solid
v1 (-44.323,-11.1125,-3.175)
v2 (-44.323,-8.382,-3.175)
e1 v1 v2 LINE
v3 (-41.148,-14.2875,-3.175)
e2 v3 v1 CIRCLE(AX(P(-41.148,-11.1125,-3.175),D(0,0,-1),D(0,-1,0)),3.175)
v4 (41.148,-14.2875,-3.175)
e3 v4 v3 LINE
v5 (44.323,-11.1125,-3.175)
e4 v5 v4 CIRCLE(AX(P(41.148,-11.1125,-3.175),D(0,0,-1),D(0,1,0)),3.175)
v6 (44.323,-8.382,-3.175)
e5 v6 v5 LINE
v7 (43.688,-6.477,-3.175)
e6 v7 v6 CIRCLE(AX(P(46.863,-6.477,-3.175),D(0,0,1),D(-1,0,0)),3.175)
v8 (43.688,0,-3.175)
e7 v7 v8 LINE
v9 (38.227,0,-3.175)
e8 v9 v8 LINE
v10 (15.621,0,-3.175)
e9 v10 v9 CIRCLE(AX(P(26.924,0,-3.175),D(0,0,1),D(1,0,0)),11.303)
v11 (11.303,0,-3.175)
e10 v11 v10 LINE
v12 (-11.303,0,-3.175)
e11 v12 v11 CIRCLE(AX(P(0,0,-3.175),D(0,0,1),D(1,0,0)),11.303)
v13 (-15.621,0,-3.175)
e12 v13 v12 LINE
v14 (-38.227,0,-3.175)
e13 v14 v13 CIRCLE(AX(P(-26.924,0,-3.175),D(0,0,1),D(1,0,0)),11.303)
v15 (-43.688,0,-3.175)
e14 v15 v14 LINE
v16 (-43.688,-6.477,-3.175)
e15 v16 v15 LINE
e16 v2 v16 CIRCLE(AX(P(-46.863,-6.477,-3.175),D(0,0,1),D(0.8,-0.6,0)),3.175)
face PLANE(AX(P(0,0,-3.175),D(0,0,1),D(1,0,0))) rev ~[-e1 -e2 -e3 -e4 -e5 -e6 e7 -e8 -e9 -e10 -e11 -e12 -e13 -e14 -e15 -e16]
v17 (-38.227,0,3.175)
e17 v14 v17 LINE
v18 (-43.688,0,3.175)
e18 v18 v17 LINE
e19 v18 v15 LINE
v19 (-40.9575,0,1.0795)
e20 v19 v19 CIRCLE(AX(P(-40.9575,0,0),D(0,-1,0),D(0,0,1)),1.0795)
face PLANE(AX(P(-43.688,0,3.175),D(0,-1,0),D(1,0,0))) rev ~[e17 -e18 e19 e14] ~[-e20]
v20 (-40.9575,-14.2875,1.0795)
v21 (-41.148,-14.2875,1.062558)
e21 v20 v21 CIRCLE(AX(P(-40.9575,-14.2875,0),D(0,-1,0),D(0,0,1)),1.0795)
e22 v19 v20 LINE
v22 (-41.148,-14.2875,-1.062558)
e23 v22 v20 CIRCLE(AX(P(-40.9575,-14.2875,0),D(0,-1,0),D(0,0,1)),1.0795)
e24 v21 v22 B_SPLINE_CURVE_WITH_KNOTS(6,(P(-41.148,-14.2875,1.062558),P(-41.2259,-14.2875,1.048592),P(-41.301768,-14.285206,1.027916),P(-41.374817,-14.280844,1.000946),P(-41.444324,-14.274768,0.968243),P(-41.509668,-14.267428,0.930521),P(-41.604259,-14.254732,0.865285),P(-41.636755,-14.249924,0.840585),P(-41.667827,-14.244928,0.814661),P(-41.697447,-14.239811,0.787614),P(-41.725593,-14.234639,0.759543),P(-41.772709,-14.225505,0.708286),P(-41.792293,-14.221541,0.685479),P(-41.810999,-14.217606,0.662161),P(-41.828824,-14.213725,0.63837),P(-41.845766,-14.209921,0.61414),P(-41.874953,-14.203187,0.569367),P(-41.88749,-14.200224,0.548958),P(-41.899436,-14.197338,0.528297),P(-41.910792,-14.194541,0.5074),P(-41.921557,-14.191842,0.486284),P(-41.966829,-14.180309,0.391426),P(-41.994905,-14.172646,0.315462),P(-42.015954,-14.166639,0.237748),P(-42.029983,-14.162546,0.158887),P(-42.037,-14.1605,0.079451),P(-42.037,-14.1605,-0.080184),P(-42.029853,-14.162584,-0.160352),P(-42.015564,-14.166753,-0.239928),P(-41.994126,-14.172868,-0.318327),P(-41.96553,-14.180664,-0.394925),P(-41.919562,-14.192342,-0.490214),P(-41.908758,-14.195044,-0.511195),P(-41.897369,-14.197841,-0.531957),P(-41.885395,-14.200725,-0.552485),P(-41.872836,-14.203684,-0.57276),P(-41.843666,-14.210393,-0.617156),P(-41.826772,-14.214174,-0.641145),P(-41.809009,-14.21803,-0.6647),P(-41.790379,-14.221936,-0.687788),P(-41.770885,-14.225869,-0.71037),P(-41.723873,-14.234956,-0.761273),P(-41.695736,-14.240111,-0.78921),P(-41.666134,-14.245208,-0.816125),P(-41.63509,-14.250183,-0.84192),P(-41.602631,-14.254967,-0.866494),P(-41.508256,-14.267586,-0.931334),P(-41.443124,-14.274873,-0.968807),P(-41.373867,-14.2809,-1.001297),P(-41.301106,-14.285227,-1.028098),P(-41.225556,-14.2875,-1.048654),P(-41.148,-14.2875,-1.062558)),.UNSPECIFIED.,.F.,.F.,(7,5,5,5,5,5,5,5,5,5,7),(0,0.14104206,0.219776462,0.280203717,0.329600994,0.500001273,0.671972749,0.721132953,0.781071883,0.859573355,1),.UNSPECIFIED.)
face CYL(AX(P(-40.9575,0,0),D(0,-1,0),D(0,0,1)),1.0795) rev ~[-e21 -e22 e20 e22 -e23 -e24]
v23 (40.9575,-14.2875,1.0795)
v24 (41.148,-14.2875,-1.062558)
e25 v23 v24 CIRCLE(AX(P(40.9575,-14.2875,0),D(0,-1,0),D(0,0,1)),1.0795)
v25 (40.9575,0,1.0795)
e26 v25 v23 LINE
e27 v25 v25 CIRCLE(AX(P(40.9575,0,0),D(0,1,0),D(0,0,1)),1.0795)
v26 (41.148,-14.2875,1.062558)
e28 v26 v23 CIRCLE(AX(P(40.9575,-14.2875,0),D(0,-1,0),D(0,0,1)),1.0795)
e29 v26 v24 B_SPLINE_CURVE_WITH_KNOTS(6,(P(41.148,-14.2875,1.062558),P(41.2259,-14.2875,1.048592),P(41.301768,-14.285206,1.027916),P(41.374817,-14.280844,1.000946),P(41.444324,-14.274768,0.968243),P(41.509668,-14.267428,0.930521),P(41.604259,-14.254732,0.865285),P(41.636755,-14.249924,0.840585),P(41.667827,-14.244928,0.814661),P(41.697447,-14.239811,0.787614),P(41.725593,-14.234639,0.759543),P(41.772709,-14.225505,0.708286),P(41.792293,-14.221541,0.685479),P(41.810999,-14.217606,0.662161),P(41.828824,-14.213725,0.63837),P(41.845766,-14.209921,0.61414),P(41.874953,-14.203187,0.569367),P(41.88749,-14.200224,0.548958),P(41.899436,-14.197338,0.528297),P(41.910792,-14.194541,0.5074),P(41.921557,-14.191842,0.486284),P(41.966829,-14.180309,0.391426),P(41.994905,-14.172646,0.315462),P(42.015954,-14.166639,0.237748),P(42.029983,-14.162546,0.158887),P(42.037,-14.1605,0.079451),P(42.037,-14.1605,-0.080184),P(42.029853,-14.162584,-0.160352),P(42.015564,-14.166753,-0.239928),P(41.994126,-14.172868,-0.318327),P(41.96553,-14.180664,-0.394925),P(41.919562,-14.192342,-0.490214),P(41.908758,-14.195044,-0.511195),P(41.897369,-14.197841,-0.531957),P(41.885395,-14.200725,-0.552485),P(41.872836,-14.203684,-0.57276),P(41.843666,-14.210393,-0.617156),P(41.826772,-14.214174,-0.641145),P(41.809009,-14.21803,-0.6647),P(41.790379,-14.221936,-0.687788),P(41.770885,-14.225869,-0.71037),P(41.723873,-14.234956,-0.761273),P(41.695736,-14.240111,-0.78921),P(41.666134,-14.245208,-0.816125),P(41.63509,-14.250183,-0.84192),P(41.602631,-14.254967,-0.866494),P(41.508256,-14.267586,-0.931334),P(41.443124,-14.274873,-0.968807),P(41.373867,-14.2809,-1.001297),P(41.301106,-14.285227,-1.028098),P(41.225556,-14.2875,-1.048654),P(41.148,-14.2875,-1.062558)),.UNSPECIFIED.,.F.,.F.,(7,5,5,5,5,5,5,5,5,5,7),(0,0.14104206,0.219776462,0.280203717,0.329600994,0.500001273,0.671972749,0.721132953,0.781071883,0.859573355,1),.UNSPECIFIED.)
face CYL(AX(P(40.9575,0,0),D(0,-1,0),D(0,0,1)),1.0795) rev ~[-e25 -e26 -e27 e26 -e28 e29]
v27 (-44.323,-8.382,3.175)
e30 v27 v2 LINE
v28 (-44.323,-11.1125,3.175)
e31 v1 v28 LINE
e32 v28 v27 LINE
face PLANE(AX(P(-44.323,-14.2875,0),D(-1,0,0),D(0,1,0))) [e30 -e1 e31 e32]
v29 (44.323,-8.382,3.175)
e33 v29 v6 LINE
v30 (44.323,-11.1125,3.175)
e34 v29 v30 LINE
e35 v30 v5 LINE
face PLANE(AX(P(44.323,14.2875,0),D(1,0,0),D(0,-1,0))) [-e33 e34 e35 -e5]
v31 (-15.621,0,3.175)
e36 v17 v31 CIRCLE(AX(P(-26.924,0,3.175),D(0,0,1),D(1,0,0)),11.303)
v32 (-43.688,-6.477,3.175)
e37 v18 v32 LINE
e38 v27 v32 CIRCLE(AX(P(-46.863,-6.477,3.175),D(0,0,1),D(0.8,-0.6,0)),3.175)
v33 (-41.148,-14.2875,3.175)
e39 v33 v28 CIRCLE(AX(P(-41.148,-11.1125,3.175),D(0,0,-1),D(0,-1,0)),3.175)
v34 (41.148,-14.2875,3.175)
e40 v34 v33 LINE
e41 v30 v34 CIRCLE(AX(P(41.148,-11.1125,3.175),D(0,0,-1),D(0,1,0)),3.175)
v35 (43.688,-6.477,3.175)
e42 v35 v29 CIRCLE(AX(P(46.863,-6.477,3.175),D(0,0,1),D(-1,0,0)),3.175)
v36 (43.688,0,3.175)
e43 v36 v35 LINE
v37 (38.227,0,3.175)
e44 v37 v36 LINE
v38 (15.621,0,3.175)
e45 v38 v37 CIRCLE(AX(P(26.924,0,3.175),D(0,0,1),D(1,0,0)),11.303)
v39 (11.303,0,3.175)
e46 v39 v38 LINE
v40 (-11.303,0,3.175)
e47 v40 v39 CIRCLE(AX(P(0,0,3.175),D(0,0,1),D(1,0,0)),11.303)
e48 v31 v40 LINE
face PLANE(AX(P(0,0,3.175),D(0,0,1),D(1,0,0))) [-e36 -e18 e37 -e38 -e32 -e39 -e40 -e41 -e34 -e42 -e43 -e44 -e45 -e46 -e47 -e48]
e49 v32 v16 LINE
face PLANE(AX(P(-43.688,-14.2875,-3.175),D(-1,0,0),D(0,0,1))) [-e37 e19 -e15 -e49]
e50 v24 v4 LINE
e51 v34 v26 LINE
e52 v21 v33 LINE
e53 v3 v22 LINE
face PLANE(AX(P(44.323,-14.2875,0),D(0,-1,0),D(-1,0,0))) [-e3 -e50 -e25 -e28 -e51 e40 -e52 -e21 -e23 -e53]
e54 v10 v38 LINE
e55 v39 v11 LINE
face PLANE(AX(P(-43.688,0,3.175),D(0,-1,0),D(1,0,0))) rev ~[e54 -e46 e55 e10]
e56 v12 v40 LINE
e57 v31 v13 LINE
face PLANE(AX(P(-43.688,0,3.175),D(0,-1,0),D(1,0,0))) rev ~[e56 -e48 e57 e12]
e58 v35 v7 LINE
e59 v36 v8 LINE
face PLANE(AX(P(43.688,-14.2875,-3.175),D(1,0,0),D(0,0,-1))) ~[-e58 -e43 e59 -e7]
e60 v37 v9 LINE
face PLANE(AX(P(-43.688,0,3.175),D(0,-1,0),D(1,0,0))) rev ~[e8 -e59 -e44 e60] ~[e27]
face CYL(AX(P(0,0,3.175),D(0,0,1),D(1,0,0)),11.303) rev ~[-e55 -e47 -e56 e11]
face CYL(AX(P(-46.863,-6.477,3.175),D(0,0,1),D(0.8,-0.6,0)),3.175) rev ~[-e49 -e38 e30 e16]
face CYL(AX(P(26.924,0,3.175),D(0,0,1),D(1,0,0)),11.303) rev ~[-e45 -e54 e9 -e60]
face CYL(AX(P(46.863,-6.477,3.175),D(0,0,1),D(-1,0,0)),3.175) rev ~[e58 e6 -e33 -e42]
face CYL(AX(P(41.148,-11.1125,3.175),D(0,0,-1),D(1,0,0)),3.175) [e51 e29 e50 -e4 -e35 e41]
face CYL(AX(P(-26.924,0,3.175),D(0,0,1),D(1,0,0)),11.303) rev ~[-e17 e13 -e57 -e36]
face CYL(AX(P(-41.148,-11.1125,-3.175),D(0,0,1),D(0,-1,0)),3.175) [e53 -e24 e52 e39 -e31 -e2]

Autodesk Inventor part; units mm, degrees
ref_plane "YZ Plane" through (0, 0, 0) normal (1, 0, 0) x (0, 1, 0)
ref_plane "XZ Plane" through (0, 0, 0) normal (0, 1, 0) x (-1, 0, 0)
ref_plane "XY Plane" through (0, 0, 0) normal (0, 0, 1) x (1, 0, 0)
sketch "Sketch1" plane through (0, 0, 0) normal (0, 0, 1) x (1, 0, 0)
  line L0 (-44.323, 14.2875) -> (44.323, 14.2875)
  line L1 (44.323, 14.2875) -> (44.323, -14.2875)
  line L2 (44.323, -14.2875) -> (-44.323, -14.2875)
  line L3 (-44.323, -14.2875) -> (-44.323, 14.2875)
  point P0 (0, 0)
  dimension "d0" = 88.646
  dimension "d1" = 44.323
  dimension "d2" = 14.2875
  dimension "d3" = 28.575
extrude "Extrusion1" add sketch "Sketch1" along normal mid plane 6.35
sketch "Sketch2" plane through (0, 0, 3.175) normal (0, 0, 1) x (1, 0, 0)
  circle A0 centre (-26.924, 0) radius 11.303
  circle A1 centre (0, 0) radius 11.303
  line L0 (44.323, -14.2875) -> (44.323, 14.2875) projected
  circle A2 centre (26.924, 0) radius 11.303
  line L1 (-44.323, 14.2875) -> (-44.323, -14.2875) projected
  line L2 (-44.323, 0) -> (44.323, 0) construction
  line L3 (44.323, 14.2875) -> (-44.323, 14.2875) projected
  point P0 (0, 0)
  dimension "d6" = 22.606
  dimension "d9" = 22.606
  dimension "d11" = 22.606
  dimension "d14" = 26.924
  dimension "d21" = 88.646
  dimension "d22" = 26.924
  dimension "d50" = 0
sketch "Sketch4" plane through (-44.323, -14.2875, -3.175) normal (-1, 0, 0) x (0, 0, 1)
  line L0 (0, 0) -> (0, 28.575) projected
  line L1 (6.35, 28.575) -> (6.35, 0) projected
  line L2 (0, 22.6695) -> (6.35, 22.6695)
  line L3 (6.35, 22.6695) -> (6.35, 5.9055)
  line L4 (6.35, 5.9055) -> (0, 5.9055)
  line L5 (0, 5.9055) -> (0, 22.6695)
  point P0 (3.175, 14.2875)
  dimension "d30" = 8.382
  dimension "d31" = 16.764
extrude "Extrusion3" cut sketch "Sketch4" against normal blind 0.635
mirror "Mirror1" about plane through (0, 0, 0) normal (1, 0, 0) of "Extrusion3"
sketch "Sketch7" plane through (-44.323, -14.2875, 3.175) normal (0, -1, 0) x (1, 0, 0)
  line L0 (30.353, -14.605) -> (58.293, -14.605)
  line L1 (58.293, -14.605) -> (58.293, 8.255)
  line L2 (58.293, 8.255) -> (30.353, 8.255)
  line L3 (30.353, 8.255) -> (30.353, -14.605)
  point P0 (44.323, -3.175)
  dimension "d39" = 27.94
  dimension "d40" = 22.86
  dimension "d41" = 11.43
  dimension "d42" = 13.97
extrude "Extrusion5" [suppressed]
sketch "Sketch8" plane through (0, 0, -3.175) normal (0, 0, -1) x (-1, 0, 0)
  line L0 (-44.323, 14.2875) -> (44.323, 14.2875) projected
  line L1 (15.6718, 14.2875) -> (-15.6718, 14.2875)
  line L2 (-15.6718, 14.2875) -> (-15.6718, 52.3875)
  line L3 (-15.6718, 52.3875) -> (15.6718, 52.3875)
  line L4 (15.6718, 52.3875) -> (15.6718, 14.2875)
  point P0 (0, 0)
  dimension "d45" = 31.3436
  dimension "d46" = 38.1
  dimension "d47" = 15.6718
extrude "Extrusion6" add sketch "Sketch8" against normal up to surface (6.35 mm away)
extrude "Extrusion7" cut sketch "Sketch2" against normal blind 25.4
sketch "Sketch9" plane through (-15.6718, 52.3875, -3.175) normal (0, 1, 0) x (1, 0, 0)
  line L0 (-28.6512, -6.35) -> (59.9948, -6.35) projected
  line L1 (3.1718, -6.35) -> (28.1718, -6.35)
  line L2 (28.1718, -6.35) -> (28.1718, -3.175)
  line L3 (28.1718, -3.175) -> (3.1718, -3.175)
  line L4 (3.1718, -3.175) -> (3.1718, -6.35)
  point P0 (15.6718, -3.175)
  dimension "d64" = 3.175
  dimension "d65" = 25
  dimension "d66" = 12.5
extrude "Extrusion8" cut sketch "Sketch9" against normal blind 0.9
sketch "Sketch13" plane through (0, 0, 3.175) normal (0, 0, 1) x (1, 0, 0)
  line L0 (-15.6718, 52.3875) -> (-12.5, 52.3875) projected
  line L1 (-12.5, 52.3875) -> (12.5, 52.3875) projected
  line L2 (12.5, 52.3875) -> (15.6718, 52.3875) projected
  line L3 (15.6718, 52.3875) -> (15.6718, 14.2875) projected
  line L4 (-15.6718, 14.2875) -> (-15.6718, 52.3875) projected
  line L5 (-15.6718, 14.2875) -> (-44.323, 14.2875) projected
  line L6 (44.323, 14.2875) -> (15.6718, 14.2875) projected
  line L7 (44.323, 8.382) -> (44.323, 14.2875) projected
  line L8 (-44.323, 14.2875) -> (-44.323, 8.382) projected
  line L9 (-44.323, 8.382) -> (-43.688, 8.382) projected
  line L10 (43.688, 8.382) -> (44.323, 8.382) projected
  line L11 (-43.688, 8.382) -> (-43.688, 0)
  line L12 (-43.688, 8.382) -> (-43.688, -8.382) projected
  line L13 (-43.688, 0) -> (43.688, 0)
  line L14 (43.688, 8.382) -> (43.688, -8.382) projected
  line L15 (43.688, 0) -> (43.688, 8.382)
  point P0 (0, 0)
extrude "Extrusion11" cut sketch "Sketch13" against normal through all
fillet "Fillet3" radius 3.175 2 edges at (-43.688, -8.382, 0) (43.688, -8.382, 0)
fillet "Fillet1" radius 3.175 2 edges at (44.323, -14.2875, 0) (-44.323, -14.2875, 0)
sketch "Sketch14" plane through (-43.688, 0, 3.175) normal (0, 1, 0) x (1, 0, 0)
  line L0 (5.461, 6.35) -> (5.461, 0) projected
  line L1 (0, 6.35) -> (5.461, 6.35) projected
  line L2 (0, 0) -> (0, 6.35) projected
  line L3 (5.461, 0) -> (0, 0) projected
  circle A0 centre (2.7305, 3.175) radius 1.5494
  point P0 (43.688, 3.175)
  dimension "d84" = 3.0988
  dimension "d85" = 5.461
  dimension "d87" = 3.175
  dimension "d88" = 2.7305
  dimension "d98" = 6.35
hole "Hole1" at (-40.9575, 0, 0) direction (0, -1, 0) diameter 2.159 end through all
mirror "Mirror4" about plane through (0, 0, 0) normal (1, 0, 0) of "Hole1"
equation "\"d1\" = 0.5 * d0"
equation "\"d2\" = 0.5 * d3"
equation "\"d9\" = d7"
equation "\"d11\" = d9"
equation "\"d22\" = d14"
equation "\"d30\" = 0.5 * d31"
equation "\"d41\" = 0.5 * d40"
equation "\"d42\" = 0.5 * d39"
equation "\"d47\" = 0.5 * d45"
equation "\"d66\" = 0.5 * d65"
equation "\"d87\" = 0.5 * d98"
equation "\"d88\" = 0.5 * d85"
equation "\"d7\" = d6"
properties part number "Tube Holder Halve 3" material "Aluminum 6061-AHC"
